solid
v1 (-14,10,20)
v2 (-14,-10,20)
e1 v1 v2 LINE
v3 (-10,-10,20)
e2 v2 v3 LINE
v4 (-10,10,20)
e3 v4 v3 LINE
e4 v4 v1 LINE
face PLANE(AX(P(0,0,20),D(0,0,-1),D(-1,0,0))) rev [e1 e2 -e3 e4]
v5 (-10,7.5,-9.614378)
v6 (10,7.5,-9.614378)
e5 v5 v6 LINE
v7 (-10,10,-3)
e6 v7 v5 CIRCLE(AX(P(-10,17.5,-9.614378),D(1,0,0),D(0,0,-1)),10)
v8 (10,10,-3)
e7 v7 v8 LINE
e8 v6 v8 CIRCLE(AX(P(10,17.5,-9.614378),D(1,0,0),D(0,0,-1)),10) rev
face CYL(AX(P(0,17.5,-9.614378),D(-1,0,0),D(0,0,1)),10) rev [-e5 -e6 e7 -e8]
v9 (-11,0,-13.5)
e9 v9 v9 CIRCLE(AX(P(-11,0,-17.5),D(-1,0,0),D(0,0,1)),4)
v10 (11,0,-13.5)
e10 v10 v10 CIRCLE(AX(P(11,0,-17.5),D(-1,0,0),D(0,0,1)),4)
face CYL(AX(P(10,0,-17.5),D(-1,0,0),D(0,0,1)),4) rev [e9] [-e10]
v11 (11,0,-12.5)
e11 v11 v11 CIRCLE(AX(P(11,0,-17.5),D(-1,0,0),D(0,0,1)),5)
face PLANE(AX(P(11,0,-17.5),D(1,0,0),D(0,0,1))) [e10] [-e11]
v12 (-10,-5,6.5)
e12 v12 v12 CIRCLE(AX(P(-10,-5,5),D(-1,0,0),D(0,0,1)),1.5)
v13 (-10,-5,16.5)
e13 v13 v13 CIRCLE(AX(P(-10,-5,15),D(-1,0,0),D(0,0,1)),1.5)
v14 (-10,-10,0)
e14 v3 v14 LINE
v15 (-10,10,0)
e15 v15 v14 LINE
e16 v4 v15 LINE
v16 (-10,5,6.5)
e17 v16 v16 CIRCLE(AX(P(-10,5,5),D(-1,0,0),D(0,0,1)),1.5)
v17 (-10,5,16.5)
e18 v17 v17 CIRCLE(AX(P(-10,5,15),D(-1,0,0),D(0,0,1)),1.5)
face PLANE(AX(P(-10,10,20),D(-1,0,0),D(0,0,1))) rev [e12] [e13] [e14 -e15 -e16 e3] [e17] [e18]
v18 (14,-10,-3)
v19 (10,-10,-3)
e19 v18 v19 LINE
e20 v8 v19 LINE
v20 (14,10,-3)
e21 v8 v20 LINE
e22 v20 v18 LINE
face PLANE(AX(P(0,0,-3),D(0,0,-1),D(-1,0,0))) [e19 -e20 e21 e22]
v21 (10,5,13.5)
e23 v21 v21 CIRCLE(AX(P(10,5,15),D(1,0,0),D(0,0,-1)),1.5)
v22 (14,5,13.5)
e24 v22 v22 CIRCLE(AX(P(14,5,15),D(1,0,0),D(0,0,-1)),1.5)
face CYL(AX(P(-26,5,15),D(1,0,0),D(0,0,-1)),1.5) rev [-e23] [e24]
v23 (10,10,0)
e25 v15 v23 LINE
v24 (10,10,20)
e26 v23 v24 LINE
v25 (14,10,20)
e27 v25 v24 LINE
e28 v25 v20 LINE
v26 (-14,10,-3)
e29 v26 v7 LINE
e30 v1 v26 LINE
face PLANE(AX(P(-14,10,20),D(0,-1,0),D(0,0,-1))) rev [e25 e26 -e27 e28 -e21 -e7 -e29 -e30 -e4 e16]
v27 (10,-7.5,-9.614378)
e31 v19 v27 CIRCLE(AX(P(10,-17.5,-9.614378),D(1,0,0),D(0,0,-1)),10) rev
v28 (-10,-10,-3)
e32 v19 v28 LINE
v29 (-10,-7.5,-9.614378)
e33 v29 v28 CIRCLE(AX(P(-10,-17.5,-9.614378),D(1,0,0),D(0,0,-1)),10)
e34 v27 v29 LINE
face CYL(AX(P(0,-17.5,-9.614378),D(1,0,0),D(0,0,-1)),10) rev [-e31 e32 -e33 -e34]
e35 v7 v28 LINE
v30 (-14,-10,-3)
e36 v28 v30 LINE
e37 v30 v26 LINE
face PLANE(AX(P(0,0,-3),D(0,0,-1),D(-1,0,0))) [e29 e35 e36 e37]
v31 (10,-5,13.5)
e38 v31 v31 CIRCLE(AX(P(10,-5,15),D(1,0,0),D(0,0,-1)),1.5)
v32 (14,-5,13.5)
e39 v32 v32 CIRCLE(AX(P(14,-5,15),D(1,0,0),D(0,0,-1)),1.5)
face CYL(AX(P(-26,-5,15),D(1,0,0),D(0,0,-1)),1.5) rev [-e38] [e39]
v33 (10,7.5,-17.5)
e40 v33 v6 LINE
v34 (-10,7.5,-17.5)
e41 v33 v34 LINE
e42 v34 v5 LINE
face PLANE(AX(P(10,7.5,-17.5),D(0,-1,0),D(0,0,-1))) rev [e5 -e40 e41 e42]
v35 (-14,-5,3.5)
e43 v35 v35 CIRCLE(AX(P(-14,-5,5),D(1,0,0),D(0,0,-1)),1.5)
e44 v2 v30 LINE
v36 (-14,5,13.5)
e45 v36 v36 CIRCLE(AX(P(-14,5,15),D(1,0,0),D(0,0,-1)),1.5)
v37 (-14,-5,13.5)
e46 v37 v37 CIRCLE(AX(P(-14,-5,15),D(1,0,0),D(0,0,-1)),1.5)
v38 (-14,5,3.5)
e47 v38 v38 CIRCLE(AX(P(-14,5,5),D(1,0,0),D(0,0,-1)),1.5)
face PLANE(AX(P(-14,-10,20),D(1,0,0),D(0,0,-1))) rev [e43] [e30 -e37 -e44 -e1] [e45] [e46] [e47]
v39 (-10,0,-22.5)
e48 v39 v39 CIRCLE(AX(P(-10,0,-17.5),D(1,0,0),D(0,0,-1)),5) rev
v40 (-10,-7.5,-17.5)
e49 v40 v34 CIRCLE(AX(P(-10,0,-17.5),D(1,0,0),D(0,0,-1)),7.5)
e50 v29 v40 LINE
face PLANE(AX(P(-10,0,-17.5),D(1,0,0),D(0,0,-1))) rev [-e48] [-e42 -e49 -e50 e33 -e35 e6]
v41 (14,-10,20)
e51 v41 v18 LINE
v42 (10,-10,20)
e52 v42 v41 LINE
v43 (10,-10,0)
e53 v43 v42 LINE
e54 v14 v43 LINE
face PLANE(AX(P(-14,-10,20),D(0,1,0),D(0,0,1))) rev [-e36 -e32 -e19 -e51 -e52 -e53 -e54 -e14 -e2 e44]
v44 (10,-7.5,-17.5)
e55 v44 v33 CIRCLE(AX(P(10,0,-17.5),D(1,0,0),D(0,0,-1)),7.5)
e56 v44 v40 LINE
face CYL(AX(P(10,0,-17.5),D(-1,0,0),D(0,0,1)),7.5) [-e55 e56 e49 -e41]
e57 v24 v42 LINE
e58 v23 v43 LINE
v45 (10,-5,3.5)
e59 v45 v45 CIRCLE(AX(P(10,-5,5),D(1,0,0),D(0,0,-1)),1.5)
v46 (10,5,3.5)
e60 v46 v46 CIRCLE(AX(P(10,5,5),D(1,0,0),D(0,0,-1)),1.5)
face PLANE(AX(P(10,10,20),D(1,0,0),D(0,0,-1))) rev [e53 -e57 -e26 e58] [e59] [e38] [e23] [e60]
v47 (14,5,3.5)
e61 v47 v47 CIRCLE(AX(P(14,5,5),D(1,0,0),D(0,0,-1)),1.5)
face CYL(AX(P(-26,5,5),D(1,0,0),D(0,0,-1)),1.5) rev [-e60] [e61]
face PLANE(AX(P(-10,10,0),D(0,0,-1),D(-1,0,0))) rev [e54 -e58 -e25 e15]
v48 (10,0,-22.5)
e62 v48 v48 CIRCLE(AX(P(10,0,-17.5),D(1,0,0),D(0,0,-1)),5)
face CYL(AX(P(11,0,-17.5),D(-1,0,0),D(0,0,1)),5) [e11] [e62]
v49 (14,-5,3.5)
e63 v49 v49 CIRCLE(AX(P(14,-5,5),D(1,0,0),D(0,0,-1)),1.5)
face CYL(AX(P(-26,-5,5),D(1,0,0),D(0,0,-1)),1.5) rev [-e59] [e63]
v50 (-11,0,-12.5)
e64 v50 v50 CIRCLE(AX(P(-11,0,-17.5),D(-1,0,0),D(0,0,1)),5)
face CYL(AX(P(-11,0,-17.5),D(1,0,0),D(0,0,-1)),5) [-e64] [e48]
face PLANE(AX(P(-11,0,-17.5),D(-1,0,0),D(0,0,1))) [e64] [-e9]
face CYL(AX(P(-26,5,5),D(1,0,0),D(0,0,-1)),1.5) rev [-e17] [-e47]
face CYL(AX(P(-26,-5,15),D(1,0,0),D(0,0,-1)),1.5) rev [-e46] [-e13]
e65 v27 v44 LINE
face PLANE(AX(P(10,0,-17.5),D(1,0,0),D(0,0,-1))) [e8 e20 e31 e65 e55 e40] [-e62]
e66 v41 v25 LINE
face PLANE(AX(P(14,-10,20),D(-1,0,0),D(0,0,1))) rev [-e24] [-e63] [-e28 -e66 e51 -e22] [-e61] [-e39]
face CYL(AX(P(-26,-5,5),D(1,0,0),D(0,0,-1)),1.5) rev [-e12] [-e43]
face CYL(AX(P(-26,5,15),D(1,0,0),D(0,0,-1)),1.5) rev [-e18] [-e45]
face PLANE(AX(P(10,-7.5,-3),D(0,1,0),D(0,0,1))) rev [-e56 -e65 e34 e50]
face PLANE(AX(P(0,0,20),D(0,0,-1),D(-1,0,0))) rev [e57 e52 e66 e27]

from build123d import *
from build123d.topology import SkipClean

# Parameters (mm, degrees)
SKETCH_1_W          = 28
SKETCH_1_H          = 20
EXTRUDE_1_DEPTH     = 20
SKETCH_3_W          = 28
SKETCH_3_H          = 20
EXTRUDE_2_DEPTH     = 3
SKETCH_4_R          = 4
EXTRUDE_3_DEPTH     = 10
EXTRUDE_START       = 1
SKETCH_5_R          = 5
SKETCH_5_R_2        = 4
EXTRUDE_4_DEPTH     = 1
FILLET_1_R          = 10
SKETCH_11_W         = 20
SKETCH_11_H         = 20
CUT_EXTRUDE_1_DEPTH = 20
SKETCH_12_R         = 1.5
CUT_EXTRUDE_2_DEPTH = 40


with BuildPart() as part:
    # 草图1 → 凸台-拉伸1 (new body)
    with BuildSketch(Plane.XY):
        Rectangle(SKETCH_1_W, SKETCH_1_H)
    extrude(amount=EXTRUDE_1_DEPTH)

    # 草图3 → 凸台-拉伸2 (add)
    with BuildSketch(Plane(origin=(0, 0, 0), x_dir=(-1, 0, 0), z_dir=(0, 0, -1))):
        Rectangle(SKETCH_3_W, SKETCH_3_H)
    extrude(amount=EXTRUDE_2_DEPTH)

    # 草图4 → 凸台-拉伸3 (add, symmetric)
    with BuildSketch(Plane(origin=(0, 0, 0), x_dir=(0, 0, -1), z_dir=(1, 0, 0))):
        with BuildLine():
            Line((17.5, 7.5), (3, 7.5))
            Line((3, 7.5), (3, -7.5))
            Line((3, -7.5), (17.5, -7.5))
            ThreePointArc((17.5, -7.5), (25, 0), (17.5, 7.5))
        make_face()
        with Locations((17.5, 0)):
            Circle(SKETCH_4_R, mode=Mode.SUBTRACT)
    extrude(amount=EXTRUDE_3_DEPTH, both=True)

    # 草图5 → 凸台-拉伸4 (add)
    with SkipClean():  # the faces are left unmerged after this step: merging them gives an invalid solid
        with BuildSketch(Plane.ZY.offset(10).offset(EXTRUDE_START)):
            with Locations(Location((-17.5, 0, 0), (0, 0, 180))):
                Circle(SKETCH_5_R)
            with Locations((-17.5, 0)):
                Circle(SKETCH_5_R_2, mode=Mode.SUBTRACT)
        extrude_4 = extrude(amount=-EXTRUDE_4_DEPTH)

    # 镜向1: 凸台-拉伸4 across plane
    add(extrude_4.mirror(Plane(origin=(0, 0, 0), x_dir=(0, 0, 1), z_dir=(1, 0, 0))))

    # 圆角1
    # the kernel refuses this fillet: 10 mm, written as the material it adds along each edge
    with BuildSketch(Plane(origin=(-10, 7.5, -3), x_dir=(0, 1, 0), z_dir=(1, 0, 0)), Plane(origin=(10, -7.5, -3), x_dir=(0, -1, 0), z_dir=(-1, 0, 0))) as fillet_1_piece_1:
        with BuildLine():
            CenterArc((10, -6.614378278), FILLET_1_R, 138.590377891, 41.409622109)
            Line((0, -6.614378278), (-0.2, -6.614378278))
            Line((-0.2, -6.614378278), (-0.2, 0))
            Line((-0.2, 0), (0, 0.2))
            ThreePointArc((0, 0.2), (1.25, 0.2), (2.35, 0.132287566))
            Line((2.35, 0.132287566), (2.5, 0))
        make_face()
    extrude(amount=20)

    # 草图11 → 切除-拉伸1 (cut)
    with BuildSketch(Plane.XZ.offset(10)):
        with Locations((0, 10)):
            Rectangle(SKETCH_11_W, SKETCH_11_H)
    extrude(amount=-CUT_EXTRUDE_1_DEPTH, mode=Mode.SUBTRACT)

    # 草图12 → 切除-拉伸2 (cut)
    with BuildSketch(Plane(origin=(14, 0, 0), x_dir=(0, 0, -1), z_dir=(1, 0, 0))):
        with Locations((-15, 5)):
            Circle(SKETCH_12_R)
        with Locations((-5, 5)):
            Circle(SKETCH_12_R)
        with Locations((-5, -5)):
            Circle(SKETCH_12_R)
        with Locations((-15, -5)):
            Circle(SKETCH_12_R)
    extrude(amount=-CUT_EXTRUDE_2_DEPTH, mode=Mode.SUBTRACT)


solid = part.part
